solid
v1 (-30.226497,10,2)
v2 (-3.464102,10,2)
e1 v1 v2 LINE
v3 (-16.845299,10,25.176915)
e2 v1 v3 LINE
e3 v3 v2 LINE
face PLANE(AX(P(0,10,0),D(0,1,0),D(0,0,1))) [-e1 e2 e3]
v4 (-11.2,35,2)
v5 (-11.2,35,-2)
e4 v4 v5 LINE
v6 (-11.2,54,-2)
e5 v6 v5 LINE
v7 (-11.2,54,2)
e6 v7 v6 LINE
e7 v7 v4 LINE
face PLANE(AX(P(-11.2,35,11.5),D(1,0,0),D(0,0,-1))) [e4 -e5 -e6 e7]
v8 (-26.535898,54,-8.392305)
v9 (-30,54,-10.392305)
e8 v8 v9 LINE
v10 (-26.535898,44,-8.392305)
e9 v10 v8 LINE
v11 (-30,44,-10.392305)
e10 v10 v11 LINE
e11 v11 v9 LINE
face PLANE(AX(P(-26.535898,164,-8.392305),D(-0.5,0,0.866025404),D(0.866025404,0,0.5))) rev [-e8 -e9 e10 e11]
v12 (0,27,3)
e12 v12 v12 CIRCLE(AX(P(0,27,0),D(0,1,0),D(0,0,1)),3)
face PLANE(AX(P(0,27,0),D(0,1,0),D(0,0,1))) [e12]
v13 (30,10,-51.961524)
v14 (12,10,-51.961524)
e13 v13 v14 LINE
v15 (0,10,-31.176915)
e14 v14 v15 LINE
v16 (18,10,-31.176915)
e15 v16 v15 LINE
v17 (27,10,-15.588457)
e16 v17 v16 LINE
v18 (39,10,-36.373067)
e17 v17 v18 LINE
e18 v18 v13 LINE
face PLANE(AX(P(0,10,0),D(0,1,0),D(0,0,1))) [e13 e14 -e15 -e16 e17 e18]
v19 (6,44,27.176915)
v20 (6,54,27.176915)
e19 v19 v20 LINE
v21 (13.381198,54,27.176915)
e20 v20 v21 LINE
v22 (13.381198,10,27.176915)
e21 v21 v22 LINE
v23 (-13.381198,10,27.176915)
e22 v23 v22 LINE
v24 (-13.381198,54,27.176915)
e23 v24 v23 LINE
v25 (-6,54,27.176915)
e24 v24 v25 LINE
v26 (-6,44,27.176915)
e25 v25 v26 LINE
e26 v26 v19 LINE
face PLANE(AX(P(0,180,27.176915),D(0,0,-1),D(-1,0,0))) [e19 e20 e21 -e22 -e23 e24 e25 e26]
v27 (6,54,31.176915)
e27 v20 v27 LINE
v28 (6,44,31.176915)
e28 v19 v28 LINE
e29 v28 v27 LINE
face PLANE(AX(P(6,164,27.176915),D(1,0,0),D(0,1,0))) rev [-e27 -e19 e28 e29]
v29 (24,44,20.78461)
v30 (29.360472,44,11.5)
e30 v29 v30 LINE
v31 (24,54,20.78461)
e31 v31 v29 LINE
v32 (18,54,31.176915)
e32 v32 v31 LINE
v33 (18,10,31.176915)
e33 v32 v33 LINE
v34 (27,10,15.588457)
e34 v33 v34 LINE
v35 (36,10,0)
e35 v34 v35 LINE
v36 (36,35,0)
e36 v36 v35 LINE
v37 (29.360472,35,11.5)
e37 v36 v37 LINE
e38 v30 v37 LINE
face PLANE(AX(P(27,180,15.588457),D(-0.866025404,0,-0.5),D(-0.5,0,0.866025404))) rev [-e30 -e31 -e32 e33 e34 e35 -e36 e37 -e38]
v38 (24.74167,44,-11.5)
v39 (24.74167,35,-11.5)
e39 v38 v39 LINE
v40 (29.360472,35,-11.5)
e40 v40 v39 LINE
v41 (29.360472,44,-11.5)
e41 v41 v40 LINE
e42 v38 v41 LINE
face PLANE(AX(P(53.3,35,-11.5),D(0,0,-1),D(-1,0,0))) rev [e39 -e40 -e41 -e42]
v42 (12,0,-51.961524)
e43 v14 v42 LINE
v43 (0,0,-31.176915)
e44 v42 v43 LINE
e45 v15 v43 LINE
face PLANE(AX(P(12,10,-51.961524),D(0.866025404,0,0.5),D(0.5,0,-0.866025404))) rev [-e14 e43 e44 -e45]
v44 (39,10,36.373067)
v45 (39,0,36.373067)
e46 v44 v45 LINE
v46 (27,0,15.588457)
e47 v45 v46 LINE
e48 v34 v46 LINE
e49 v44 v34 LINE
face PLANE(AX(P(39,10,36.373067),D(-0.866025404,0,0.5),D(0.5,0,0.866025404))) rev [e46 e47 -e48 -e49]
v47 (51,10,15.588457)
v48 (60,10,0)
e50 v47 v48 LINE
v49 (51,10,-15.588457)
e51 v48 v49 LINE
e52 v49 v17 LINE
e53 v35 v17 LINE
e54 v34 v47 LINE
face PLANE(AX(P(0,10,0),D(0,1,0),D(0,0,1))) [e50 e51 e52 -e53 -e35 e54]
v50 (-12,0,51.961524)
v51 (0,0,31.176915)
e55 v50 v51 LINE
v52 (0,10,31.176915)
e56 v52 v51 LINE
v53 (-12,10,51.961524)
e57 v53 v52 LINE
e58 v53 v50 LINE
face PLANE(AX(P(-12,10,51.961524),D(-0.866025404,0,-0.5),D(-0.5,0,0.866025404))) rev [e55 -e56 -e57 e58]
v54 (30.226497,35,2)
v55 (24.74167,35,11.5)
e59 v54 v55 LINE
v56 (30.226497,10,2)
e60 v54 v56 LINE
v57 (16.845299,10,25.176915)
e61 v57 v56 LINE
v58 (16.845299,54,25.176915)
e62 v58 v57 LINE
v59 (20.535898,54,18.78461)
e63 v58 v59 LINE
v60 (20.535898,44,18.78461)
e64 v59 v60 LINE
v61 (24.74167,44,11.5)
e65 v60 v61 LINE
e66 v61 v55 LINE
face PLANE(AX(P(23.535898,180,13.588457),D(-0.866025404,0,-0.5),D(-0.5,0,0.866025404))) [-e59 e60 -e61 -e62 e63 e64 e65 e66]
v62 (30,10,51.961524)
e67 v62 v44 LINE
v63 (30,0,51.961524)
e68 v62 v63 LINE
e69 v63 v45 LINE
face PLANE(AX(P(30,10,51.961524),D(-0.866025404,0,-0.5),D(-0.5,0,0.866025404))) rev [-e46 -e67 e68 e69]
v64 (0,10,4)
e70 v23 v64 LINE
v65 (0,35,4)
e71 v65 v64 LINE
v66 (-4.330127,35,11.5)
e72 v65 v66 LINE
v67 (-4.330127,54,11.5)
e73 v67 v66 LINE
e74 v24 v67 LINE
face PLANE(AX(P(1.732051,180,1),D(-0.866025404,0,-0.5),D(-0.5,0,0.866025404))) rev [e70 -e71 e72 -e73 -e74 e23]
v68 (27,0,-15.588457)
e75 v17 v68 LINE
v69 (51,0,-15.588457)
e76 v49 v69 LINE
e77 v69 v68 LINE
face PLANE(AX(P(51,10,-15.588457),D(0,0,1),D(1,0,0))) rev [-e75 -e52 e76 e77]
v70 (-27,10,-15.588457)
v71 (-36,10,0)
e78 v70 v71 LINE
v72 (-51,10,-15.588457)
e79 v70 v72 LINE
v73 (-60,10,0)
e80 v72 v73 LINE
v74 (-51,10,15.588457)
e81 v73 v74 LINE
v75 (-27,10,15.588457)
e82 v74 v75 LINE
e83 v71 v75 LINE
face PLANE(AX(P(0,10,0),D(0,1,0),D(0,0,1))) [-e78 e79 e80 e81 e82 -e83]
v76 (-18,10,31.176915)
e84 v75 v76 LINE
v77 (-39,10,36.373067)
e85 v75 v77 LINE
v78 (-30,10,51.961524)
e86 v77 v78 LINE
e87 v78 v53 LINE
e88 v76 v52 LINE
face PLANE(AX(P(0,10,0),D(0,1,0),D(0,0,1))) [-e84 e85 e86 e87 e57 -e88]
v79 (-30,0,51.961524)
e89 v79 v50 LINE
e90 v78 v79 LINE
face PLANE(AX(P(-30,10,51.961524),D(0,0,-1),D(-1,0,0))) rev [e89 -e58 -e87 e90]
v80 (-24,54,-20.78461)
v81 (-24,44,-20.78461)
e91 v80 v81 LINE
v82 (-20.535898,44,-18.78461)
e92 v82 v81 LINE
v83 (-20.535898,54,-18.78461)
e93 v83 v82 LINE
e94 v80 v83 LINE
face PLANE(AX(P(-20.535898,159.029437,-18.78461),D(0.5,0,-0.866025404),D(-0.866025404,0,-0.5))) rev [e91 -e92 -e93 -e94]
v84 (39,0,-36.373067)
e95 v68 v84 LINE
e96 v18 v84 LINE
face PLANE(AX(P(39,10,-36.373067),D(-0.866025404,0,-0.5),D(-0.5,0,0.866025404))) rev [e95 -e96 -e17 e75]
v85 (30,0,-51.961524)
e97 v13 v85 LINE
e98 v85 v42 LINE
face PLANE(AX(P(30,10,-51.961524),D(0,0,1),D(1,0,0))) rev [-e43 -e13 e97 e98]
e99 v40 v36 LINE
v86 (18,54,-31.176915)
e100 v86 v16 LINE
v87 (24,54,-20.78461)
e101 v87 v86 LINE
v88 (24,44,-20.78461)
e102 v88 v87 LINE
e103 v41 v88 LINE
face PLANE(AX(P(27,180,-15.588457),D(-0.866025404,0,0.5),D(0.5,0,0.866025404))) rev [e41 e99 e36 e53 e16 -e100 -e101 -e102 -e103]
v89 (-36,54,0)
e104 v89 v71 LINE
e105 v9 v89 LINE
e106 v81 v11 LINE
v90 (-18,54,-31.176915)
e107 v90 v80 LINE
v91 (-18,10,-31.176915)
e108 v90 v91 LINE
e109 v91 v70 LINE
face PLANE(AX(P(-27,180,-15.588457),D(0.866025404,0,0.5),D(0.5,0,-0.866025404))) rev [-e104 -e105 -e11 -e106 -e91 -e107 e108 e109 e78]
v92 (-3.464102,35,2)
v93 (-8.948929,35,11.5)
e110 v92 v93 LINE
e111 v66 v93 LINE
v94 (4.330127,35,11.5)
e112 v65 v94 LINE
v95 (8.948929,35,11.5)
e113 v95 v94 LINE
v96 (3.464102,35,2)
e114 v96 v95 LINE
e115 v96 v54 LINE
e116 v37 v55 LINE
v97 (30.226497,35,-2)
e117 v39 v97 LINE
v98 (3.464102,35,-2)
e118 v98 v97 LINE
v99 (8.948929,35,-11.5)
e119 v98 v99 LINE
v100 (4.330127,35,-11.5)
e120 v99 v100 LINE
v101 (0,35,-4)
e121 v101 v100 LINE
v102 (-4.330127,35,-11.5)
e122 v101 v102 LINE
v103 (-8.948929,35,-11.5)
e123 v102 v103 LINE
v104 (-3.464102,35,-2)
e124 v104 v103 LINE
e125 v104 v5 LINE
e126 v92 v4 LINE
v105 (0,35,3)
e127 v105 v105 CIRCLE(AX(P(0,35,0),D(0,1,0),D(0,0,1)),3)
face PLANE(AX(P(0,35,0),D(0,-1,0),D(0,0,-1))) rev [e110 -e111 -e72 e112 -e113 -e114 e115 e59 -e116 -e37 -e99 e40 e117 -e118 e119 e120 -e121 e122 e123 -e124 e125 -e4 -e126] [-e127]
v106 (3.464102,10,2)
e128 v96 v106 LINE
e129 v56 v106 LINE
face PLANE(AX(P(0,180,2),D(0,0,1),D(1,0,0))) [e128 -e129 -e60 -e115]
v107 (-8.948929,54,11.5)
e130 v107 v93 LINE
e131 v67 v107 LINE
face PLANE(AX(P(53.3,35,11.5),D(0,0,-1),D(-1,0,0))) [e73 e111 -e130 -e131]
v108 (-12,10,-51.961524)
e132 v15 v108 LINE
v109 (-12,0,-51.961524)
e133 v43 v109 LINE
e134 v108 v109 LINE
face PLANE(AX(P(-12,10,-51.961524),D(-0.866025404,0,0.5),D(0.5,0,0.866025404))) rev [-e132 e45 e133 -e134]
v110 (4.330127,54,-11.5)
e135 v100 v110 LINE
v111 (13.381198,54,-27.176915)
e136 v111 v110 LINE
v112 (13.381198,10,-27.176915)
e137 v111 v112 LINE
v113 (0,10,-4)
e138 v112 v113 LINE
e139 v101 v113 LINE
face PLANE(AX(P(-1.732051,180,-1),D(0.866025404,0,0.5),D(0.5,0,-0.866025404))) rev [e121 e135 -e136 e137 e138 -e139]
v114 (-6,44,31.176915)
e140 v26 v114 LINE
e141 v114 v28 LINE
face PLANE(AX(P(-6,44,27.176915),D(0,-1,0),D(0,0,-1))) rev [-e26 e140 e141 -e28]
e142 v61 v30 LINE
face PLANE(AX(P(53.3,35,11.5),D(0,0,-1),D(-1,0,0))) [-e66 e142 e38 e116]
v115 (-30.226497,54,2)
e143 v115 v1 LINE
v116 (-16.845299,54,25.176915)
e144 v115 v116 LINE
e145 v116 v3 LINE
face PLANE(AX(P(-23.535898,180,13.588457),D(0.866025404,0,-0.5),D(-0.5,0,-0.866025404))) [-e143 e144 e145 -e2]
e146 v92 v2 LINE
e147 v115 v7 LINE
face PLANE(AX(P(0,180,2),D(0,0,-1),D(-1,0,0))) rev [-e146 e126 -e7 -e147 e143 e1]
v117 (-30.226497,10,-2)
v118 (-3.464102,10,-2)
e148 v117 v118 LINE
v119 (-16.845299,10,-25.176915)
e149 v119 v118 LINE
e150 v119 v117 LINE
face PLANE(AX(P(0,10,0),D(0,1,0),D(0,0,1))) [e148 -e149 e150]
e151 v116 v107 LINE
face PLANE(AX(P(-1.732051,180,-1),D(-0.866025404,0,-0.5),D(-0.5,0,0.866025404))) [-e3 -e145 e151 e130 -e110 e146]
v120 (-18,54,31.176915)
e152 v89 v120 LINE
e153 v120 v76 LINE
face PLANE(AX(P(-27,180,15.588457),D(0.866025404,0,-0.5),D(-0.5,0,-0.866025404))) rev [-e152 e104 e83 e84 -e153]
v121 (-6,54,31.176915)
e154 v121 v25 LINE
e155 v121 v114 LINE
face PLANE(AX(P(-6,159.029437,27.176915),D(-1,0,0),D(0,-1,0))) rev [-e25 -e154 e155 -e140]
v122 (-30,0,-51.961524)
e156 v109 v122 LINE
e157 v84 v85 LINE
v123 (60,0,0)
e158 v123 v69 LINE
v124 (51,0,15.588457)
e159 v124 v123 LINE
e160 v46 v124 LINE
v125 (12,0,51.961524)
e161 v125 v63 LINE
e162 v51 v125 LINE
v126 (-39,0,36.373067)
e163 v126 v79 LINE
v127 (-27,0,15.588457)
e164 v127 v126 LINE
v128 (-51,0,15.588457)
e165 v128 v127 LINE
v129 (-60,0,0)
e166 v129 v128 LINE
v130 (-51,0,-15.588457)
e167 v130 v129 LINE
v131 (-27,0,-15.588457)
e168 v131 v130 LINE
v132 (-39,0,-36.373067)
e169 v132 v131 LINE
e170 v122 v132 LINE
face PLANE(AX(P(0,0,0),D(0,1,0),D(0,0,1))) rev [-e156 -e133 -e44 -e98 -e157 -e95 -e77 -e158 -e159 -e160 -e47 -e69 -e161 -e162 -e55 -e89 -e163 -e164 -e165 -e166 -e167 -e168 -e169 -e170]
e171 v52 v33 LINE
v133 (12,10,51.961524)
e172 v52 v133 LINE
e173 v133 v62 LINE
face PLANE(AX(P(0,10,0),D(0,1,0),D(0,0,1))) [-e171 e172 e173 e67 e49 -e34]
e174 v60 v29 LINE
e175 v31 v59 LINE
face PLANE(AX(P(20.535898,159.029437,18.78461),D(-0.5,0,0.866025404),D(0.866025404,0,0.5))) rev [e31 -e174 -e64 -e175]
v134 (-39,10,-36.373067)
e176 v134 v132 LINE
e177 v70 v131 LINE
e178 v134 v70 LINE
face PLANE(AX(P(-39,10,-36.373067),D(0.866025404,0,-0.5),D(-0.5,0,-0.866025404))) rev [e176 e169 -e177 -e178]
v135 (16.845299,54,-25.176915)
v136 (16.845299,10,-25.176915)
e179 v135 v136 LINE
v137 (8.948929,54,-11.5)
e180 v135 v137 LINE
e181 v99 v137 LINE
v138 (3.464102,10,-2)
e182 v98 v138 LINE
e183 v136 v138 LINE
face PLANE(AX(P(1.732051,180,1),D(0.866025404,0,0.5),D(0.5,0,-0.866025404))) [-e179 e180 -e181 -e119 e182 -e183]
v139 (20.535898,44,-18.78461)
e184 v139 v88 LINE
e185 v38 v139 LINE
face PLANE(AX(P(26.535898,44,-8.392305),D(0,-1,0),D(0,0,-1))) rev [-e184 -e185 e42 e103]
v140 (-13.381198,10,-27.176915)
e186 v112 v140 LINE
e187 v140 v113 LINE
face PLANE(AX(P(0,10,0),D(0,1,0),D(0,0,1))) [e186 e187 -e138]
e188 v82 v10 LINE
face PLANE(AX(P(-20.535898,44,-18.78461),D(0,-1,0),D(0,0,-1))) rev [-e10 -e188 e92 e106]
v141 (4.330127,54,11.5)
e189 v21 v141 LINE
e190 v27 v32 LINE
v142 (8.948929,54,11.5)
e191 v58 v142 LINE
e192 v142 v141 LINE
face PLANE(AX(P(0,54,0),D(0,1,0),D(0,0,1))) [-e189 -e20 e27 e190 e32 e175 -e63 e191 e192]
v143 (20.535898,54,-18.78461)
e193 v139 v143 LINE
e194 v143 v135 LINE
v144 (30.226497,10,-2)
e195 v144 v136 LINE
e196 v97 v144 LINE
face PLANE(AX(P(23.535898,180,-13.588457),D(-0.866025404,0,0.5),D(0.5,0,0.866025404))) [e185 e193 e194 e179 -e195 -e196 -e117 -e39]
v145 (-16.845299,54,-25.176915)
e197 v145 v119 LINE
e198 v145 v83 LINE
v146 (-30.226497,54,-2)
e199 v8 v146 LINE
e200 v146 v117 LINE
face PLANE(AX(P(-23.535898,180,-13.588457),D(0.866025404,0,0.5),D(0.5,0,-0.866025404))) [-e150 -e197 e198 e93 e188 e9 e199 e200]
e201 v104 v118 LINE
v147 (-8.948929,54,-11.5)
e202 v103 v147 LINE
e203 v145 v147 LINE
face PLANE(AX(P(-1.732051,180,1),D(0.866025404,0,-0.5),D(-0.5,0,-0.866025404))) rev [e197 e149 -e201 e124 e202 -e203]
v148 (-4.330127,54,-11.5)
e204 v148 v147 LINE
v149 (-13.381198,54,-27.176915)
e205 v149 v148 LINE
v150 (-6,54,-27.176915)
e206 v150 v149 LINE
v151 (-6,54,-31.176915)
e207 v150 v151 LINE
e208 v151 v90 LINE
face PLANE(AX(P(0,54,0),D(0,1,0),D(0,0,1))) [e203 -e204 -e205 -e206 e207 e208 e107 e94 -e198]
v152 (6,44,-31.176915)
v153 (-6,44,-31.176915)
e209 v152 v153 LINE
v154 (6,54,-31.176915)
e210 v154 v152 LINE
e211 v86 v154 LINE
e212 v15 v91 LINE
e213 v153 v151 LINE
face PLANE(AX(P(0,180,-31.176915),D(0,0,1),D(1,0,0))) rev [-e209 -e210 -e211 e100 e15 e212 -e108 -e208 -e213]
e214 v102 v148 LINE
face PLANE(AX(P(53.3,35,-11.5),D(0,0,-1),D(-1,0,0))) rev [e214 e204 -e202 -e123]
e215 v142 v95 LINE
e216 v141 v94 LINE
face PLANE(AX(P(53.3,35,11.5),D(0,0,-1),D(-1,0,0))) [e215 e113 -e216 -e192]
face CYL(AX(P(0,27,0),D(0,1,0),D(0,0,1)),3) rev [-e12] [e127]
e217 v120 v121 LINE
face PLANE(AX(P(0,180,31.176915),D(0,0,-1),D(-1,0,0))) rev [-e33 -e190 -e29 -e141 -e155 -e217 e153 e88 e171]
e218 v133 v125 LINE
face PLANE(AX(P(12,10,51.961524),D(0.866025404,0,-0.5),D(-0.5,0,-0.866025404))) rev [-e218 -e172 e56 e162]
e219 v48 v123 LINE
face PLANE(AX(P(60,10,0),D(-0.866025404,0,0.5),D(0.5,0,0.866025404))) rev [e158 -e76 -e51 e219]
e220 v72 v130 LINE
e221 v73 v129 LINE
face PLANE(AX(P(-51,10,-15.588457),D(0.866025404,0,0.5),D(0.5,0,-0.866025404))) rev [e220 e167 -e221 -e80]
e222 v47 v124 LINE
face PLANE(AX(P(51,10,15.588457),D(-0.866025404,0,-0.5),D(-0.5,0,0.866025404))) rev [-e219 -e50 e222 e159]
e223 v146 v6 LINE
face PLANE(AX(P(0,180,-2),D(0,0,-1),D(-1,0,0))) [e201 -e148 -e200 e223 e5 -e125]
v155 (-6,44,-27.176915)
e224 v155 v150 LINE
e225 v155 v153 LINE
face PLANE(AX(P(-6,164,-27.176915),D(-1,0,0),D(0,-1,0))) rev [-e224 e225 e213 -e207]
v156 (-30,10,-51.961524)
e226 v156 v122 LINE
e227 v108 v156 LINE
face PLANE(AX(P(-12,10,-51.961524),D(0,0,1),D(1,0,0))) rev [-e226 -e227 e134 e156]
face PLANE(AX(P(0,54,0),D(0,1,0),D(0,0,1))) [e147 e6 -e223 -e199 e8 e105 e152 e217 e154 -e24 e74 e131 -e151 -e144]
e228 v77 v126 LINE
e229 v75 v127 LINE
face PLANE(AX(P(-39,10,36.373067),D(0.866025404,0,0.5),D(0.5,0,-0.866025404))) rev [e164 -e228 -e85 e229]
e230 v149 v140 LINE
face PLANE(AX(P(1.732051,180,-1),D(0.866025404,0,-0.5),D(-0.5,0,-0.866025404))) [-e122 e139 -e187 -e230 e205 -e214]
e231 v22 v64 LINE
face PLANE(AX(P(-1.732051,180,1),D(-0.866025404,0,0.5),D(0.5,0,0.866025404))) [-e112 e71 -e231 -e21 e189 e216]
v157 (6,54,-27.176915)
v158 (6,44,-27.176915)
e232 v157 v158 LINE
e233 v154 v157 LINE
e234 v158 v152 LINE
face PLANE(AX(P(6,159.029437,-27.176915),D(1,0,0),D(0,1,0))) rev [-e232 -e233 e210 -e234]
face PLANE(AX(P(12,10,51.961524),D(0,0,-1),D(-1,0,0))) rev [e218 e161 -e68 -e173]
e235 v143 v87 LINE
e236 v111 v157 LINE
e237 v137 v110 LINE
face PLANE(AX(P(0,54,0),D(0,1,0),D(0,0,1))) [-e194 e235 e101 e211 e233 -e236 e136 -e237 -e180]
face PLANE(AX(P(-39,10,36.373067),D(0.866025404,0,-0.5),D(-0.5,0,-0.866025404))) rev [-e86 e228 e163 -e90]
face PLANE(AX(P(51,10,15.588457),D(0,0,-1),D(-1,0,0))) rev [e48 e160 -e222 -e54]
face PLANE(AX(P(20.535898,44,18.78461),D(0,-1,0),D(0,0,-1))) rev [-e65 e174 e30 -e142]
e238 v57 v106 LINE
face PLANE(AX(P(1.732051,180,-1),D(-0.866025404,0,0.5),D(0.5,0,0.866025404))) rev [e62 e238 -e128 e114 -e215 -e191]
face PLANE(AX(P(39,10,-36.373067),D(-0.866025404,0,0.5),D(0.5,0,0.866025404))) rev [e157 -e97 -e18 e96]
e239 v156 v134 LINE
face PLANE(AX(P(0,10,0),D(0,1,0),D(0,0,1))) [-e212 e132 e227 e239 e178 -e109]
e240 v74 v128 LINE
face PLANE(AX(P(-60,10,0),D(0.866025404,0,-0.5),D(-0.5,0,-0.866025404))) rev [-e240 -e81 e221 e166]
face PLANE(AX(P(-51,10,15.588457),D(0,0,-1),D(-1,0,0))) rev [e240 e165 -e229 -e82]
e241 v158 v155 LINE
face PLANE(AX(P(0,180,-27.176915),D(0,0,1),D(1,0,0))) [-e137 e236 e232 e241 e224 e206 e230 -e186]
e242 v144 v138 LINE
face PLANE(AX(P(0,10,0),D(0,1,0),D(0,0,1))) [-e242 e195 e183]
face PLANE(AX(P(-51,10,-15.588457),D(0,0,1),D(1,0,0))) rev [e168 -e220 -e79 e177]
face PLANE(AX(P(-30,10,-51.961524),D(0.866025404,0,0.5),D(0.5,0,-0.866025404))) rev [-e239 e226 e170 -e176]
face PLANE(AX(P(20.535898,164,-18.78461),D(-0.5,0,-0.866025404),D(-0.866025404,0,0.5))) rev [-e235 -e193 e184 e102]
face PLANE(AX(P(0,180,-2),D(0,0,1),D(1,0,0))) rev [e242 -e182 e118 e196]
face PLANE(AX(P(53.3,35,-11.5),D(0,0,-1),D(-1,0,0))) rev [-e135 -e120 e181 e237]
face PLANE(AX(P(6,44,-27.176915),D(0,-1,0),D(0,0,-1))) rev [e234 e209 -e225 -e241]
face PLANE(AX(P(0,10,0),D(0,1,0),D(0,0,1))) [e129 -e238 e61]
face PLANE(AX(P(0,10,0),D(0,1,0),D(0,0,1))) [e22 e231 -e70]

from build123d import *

# Parameters (mm, degrees)
SALIENTE_EXTRUIR1_DEPTH = 10
SALIENTE_EXTRUIR2_DEPTH = 170
CORTAR_EXTRUIR1_DEPTH   = 4
MATRIZC1_COUNT          = 5
MATRIZC1_ANGLE          = 240
CROQUIS4_W              = 24
CROQUIS4_H              = 12
SALIENTE_EXTRUIR3_DEPTH = 36
CROQUIS5_W              = 24
CROQUIS5_H              = 9
CORTAR_EXTRUIR2_DEPTH   = 24
CHAFL_N1_SIZE2          = 36
CHAFL_N1_SIZE           = 98.9091871
CORTAR_EXTRUIR3_DEPTH   = 24
CROQUIS7_W              = 30
CROQUIS7_H              = 18
CROQUIS7_R              = 3
SALIENTE_EXTRUIR4_DEPTH = 3
CROQUIS8_W              = 150
CROQUIS8_H              = 150
CORTAR_EXTRUIR4_DEPTH   = 130
CROQUIS9_W              = 64.5
CROQUIS9_H              = 23
CORTAR_EXTRUIR5_DEPTH   = 19
CROQUIS10_R             = 3
CORTAR_EXTRUIR6_DEPTH   = 8


with BuildPart() as part:
    # Croquis1 → Saliente-Extruir1 (new body)
    with BuildSketch(Plane(origin=(0, 0, 0), x_dir=(1, 0, 0), z_dir=(0, 1, 0))):
        Polygon((-12, 51.961524227), (-30, 51.961524227), (-39, 36.373066959), (-27, 15.588457268), (-51, 15.588457268), (-60, 0), (-51, -15.588457268), (-27, -15.588457268), (-39, -36.373066959), (-30, -51.961524227), (-12, -51.961524227), (0, -31.176914536), (12, -51.961524227), (30, -51.961524227), (39, -36.373066959), (27, -15.588457268), (51, -15.588457268), (60, 0), (51, 15.588457268), (27, 15.588457268), (39, 36.373066959), (30, 51.961524227), (12, 51.961524227), (0, 31.176914536), align=None)
    extrude(amount=SALIENTE_EXTRUIR1_DEPTH)

    # Croquis2 → Saliente-Extruir2 (add)
    # profile 1 of 2: a face of its own
    with BuildSketch(Plane(origin=(0, 10, 0), x_dir=(1, 0, 0), z_dir=(0, 1, 0))):
        Polygon((36, 0), (18, 31.176914536), (-18, 31.176914536), (-36, 0), (-18, -31.176914536), (18, -31.176914536), align=None)
        Polygon((15.690598923, 27.176914536), (-15.690598923, 27.176914536), (-31.381197846, 0), (-15.690598923, -27.176914536), (15.690598923, -27.176914536), (31.381197846, 0), align=None, mode=Mode.SUBTRACT)
    # profile 2 of 2: a face of its own
    with BuildSketch(Plane(origin=(0, 10, 0), x_dir=(1, 0, 0), z_dir=(0, 1, 0))):
        Polygon((-13.381197846, 27.176914536), (-15.690598923, 27.176914536), (-16.845299462, 25.176914536), (-3.464101615, 2), (-30.226497308, 2), (-31.381197846, 0), (-30.226497308, -2), (-3.464101615, -2), (-16.845299462, -25.176914536), (-15.690598923, -27.176914536), (-13.381197846, -27.176914536), (0, -4), (13.381197846, -27.176914536), (15.690598923, -27.176914536), (16.845299462, -25.176914536), (3.464101615, -2), (30.226497308, -2), (31.381197846, 0), (30.226497308, 2), (3.464101615, 2), (16.845299462, 25.176914536), (15.690598923, 27.176914536), (13.381197846, 27.176914536), (0, 4), align=None)
    extrude(amount=SALIENTE_EXTRUIR2_DEPTH)

    # Croquis3 → Cortar-Extruir1 (cut)
    with BuildSketch(Plane.XY.offset(31.176914536)):
        Polygon((-14, 172), (-2, 172), (6, 164), (6, 44), (-6, 44), (-6, 159.029437252), (-6.970562748, 160), (-14, 160), align=None)
    cortar_extruir1 = extrude(amount=-CORTAR_EXTRUIR1_DEPTH, mode=Mode.SUBTRACT)

    # MatrizC1: Cortar-Extruir1 ×5 about axis
    matrizc1_axis = Axis((0, 0, 0), (0, 1, 0))
    for i in range(1, MATRIZC1_COUNT):
        add(cortar_extruir1.rotate(matrizc1_axis, i * MATRIZC1_ANGLE / (MATRIZC1_COUNT - 1)), mode=Mode.SUBTRACT)

    # Croquis4 → Saliente-Extruir3 (add)
    with BuildSketch(Plane(origin=(-27, 0, 15.588457268), x_dir=(0.5000000000000002, 0, 0.8660254037844386), z_dir=(-0.8660254037844386, 0, 0.5000000000000002))):
        with Locations((0, 172)):
            Rectangle(CROQUIS4_W, CROQUIS4_H)
    extrude(amount=SALIENTE_EXTRUIR3_DEPTH)

    # Croquis5 → Cortar-Extruir2 (cut)
    with BuildSketch(Plane(origin=(-58.176914536, 0, 33.588457268), x_dir=(0.5000000000000003, 0, 0.8660254037844386), z_dir=(-0.8660254037844385, 0, 0.5000000000000002))):
        with Locations((0, 173.5)):
            Rectangle(CROQUIS5_W, CROQUIS5_H)
    extrude(amount=-CORTAR_EXTRUIR2_DEPTH, mode=Mode.SUBTRACT)

    # Chaflán1
    chafl_n1_edges = [part.edges().sort_by_distance(p)[0] for p in [
        (-27, 166, 15.588457268),
    ]]
    chafl_n1_side = [part.faces().sort_by_distance(p)[0] for p in [
        (-27, 165.28, 15.588457268),
    ]]
    chamfer(chafl_n1_edges, length=CHAFL_N1_SIZE - 0.0001, length2=CHAFL_N1_SIZE2 - 0.0001, reference=chafl_n1_side[0])  # a hair under: the kernel refuses the full size

    # Croquis6 → Cortar-Extruir3 (cut)
    with BuildSketch(Plane(origin=(-6, 0, -10.392304845), x_dir=(-0.8660254037844385, 0, 0.5000000000000003), z_dir=(-0.5000000000000003, 0, -0.8660254037844385))):
        Polygon((58.663492356, 166), (31.176914536, 90.481248101), (31.176914536, 166), align=None)
    extrude(amount=-CORTAR_EXTRUIR3_DEPTH, mode=Mode.SUBTRACT)

    # Croquis7 → Saliente-Extruir4 (add)
    with BuildSketch(Plane(origin=(-58.176914536, 0, 33.588457268), x_dir=(0.5000000000000003, 0, 0.8660254037844386), z_dir=(-0.8660254037844385, 0, 0.5000000000000002))):
        with Locations((-3, 175)):
            Rectangle(CROQUIS7_W, CROQUIS7_H)
        with Locations((-3, 175)):
            Circle(CROQUIS7_R, mode=Mode.SUBTRACT)
    extrude(amount=-SALIENTE_EXTRUIR4_DEPTH)

    # Croquis8 → Cortar-Extruir4 (cut)
    with BuildSketch(Plane(origin=(0, 184, 0), x_dir=(1, 0, 0), z_dir=(0, 1, 0))):
        Rectangle(CROQUIS8_W, CROQUIS8_H)
    extrude(amount=-CORTAR_EXTRUIR4_DEPTH, mode=Mode.SUBTRACT)

    # Croquis9 → Cortar-Extruir5 (cut)
    with BuildSketch(Plane(origin=(0, 54, 0), x_dir=(1, 0, 0), z_dir=(0, 1, 0))):
        with Locations((21.05, 0)):
            Rectangle(CROQUIS9_W, CROQUIS9_H)
    extrude(amount=-CORTAR_EXTRUIR5_DEPTH, mode=Mode.SUBTRACT)

    # Croquis10 → Cortar-Extruir6 (cut)
    with BuildSketch(Plane(origin=(0, 35, 0), x_dir=(1, 0, 0), z_dir=(0, 1, 0))):
        with Locations(Location((0, 0, 0), (0, 0, 270))):
            Circle(CROQUIS10_R)
    extrude(amount=-CORTAR_EXTRUIR6_DEPTH, mode=Mode.SUBTRACT)


solid = part.part
